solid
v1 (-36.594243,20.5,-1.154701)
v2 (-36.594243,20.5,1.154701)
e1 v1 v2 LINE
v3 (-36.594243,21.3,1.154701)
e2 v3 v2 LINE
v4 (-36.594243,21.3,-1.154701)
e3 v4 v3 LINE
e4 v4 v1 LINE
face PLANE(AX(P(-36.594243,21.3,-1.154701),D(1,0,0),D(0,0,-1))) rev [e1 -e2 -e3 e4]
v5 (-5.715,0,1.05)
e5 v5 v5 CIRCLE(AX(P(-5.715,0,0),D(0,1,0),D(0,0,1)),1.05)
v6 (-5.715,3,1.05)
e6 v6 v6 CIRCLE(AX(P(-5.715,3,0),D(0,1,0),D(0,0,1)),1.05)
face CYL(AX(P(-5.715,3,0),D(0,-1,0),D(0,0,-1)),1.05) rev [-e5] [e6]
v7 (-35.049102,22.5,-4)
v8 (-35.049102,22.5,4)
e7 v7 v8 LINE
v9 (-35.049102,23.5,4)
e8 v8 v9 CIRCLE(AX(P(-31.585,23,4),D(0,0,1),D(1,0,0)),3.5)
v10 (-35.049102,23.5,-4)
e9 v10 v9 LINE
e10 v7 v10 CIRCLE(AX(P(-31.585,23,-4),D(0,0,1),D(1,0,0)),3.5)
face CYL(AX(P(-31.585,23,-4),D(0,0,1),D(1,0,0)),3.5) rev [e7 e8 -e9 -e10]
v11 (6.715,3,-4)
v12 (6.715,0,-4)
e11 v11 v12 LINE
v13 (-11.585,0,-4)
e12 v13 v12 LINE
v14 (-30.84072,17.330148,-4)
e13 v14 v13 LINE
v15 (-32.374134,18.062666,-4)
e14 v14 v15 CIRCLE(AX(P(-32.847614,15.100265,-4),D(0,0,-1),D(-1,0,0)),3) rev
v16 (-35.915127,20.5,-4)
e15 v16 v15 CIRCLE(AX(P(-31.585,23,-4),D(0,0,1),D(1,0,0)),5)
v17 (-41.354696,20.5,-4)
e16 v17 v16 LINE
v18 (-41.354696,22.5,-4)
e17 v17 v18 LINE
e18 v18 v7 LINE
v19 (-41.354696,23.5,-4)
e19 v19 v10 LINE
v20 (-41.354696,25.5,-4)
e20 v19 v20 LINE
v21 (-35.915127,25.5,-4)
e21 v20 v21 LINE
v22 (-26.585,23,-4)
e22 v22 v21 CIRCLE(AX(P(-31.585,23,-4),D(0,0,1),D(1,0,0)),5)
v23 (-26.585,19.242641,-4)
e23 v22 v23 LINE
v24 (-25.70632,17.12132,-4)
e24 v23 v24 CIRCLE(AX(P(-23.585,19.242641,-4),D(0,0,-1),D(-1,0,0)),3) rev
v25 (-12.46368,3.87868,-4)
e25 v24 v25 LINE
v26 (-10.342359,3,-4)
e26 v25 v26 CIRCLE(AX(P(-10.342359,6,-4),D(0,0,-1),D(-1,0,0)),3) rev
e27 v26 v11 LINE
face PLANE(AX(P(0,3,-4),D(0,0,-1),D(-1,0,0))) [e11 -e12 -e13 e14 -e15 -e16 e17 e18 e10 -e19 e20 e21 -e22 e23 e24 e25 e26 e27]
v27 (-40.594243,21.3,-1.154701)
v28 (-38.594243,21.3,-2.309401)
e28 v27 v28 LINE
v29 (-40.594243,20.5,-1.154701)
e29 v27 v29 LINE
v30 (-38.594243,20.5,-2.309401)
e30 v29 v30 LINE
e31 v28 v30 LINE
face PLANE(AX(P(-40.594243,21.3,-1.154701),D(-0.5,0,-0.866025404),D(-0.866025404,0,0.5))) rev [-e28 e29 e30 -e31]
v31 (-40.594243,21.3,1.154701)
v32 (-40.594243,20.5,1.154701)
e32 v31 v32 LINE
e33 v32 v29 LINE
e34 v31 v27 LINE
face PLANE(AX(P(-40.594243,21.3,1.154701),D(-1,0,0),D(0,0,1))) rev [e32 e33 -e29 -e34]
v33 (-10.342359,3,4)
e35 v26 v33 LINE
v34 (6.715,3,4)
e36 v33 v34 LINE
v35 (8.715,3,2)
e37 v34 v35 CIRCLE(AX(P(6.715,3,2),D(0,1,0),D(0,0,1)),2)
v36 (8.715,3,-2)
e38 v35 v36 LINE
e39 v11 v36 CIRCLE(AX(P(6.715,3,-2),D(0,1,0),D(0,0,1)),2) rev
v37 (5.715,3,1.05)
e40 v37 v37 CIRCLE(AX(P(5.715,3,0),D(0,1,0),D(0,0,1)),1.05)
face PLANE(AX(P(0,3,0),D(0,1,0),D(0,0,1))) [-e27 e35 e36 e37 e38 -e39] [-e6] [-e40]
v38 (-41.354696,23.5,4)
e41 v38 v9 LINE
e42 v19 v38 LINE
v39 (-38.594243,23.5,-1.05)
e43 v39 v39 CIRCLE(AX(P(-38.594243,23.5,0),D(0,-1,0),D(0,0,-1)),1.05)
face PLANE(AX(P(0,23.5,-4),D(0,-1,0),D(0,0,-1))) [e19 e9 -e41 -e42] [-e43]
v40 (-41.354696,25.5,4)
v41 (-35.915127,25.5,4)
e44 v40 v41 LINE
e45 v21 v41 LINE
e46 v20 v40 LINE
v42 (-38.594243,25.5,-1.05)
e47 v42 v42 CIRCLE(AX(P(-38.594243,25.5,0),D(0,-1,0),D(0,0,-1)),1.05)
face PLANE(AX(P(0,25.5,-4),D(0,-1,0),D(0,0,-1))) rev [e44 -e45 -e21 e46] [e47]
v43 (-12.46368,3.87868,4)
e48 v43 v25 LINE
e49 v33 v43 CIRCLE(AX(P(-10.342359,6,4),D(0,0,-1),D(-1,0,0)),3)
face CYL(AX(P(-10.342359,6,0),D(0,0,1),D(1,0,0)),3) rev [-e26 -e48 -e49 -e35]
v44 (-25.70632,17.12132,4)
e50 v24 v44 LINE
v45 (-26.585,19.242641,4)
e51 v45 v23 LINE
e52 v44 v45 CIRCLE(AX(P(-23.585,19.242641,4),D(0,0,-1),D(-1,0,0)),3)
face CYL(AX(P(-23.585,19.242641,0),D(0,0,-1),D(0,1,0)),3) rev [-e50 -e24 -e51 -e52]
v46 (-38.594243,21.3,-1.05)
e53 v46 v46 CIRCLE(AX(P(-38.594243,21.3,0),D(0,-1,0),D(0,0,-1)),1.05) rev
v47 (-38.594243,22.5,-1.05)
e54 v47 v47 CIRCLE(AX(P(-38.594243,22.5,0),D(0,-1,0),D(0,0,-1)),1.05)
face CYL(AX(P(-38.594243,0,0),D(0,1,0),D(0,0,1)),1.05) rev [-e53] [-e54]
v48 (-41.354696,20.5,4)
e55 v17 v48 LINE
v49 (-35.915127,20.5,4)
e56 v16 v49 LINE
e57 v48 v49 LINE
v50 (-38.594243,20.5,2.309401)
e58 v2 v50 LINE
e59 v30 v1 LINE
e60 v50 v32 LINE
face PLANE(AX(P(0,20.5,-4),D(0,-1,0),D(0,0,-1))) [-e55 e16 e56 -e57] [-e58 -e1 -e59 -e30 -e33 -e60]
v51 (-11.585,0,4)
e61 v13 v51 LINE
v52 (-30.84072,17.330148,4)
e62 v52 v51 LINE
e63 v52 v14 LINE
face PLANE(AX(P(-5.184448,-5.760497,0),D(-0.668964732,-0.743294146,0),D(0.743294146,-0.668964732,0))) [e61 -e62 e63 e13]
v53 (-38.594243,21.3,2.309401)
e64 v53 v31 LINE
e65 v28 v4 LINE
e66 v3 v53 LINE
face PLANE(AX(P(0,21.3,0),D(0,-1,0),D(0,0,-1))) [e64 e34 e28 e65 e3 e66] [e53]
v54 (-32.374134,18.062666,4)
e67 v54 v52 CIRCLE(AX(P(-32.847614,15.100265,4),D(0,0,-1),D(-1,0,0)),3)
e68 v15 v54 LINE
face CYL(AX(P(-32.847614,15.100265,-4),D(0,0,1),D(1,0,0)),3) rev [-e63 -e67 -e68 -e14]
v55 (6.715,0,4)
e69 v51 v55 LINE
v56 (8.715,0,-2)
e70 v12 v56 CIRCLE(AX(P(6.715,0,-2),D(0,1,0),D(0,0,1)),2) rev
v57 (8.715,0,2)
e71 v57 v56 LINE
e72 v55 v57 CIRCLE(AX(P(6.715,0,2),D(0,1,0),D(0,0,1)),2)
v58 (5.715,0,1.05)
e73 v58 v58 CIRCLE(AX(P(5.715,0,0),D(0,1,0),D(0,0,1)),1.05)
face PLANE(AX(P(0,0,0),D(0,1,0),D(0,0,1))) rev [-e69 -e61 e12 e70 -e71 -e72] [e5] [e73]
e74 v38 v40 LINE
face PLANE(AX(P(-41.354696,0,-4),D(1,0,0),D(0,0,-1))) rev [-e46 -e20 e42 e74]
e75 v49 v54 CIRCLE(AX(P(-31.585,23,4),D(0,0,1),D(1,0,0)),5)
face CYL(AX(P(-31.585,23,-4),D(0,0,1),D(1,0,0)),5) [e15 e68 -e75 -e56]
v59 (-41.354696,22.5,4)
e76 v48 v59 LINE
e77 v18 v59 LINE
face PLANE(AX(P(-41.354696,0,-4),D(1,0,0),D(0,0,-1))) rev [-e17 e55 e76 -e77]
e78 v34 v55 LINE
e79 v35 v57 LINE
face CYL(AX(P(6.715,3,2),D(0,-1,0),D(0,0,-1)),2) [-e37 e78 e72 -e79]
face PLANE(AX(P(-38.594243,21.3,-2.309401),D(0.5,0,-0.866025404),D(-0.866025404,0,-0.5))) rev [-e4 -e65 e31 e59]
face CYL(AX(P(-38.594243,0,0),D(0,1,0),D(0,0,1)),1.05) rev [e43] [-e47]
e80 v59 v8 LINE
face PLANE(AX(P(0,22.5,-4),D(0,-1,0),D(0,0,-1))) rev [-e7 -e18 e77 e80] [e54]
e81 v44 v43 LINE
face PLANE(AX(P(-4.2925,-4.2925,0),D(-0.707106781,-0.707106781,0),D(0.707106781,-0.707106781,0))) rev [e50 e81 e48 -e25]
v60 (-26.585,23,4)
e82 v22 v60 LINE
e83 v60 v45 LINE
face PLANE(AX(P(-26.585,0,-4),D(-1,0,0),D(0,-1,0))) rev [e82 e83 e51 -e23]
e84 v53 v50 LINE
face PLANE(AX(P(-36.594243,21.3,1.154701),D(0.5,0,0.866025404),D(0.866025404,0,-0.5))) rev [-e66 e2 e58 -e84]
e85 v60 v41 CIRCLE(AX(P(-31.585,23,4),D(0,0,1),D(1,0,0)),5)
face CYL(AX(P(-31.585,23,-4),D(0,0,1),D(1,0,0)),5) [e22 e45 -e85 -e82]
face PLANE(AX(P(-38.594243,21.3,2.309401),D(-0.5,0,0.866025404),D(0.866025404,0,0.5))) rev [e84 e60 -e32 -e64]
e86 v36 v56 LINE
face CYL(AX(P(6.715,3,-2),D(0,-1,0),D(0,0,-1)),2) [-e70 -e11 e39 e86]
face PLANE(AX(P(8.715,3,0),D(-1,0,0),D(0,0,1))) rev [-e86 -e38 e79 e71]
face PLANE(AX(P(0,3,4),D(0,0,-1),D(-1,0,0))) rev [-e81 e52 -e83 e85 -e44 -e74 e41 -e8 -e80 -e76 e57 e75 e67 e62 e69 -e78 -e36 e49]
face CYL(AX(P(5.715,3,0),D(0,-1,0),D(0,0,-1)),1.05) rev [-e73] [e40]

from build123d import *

# Parameters (mm, degrees)
SKETCH1_R                = 1.05
BOSS_EXTRUDE1_DEPTH      = 3
BOSS_EXTRUDE2_DEPTH      = 4
BOSS_EXTRUDE2_DEPTH_BACK = 4
LOFT2_START              = -4
LOFT2_DEPTH              = 8
FILLET1_R                = 3
CUT_EXTRUDE1_DEPTH       = 49.748957751
CUT_EXTRUDE1_DEPTH_BACK  = 49.748957751
SKETCH8_R                = 1.05
CUT_EXTRUDE2_DEPTH       = 0.8


# Read off the part's stored shape, not the designer's step: Loft2
with BuildPart() as part:
    # Sketch1 → Boss-Extrude1 (new body)
    with BuildSketch(Plane(origin=(0, 0, 0), x_dir=(1, 0, 0), z_dir=(0, 1, 0))):
        with BuildLine():
            Line((-6.715, -4), (6.715, -4))
            ThreePointArc((6.715, -4), (8.129213562, -3.414213562), (8.715, -2))
            Line((8.715, -2), (8.715, 2))
            ThreePointArc((8.715, 2), (8.129213562, 3.414213562), (6.715, 4))
            Line((6.715, 4), (-6.715, 4))
            Line((-6.715, 4), (-11.585, 4))
            Line((-11.585, 4), (-11.585, -4))
            Line((-11.585, -4), (-6.715, -4))
        make_face()
        with Locations(Location((-5.715, 0, 0), (0, 0, 270))):
            Circle(SKETCH1_R, mode=Mode.SUBTRACT)
        with Locations(Location((5.715, 0, 0), (0, 0, 270))):
            Circle(SKETCH1_R, mode=Mode.SUBTRACT)
    extrude(amount=BOSS_EXTRUDE1_DEPTH)



with BuildPart() as body_2:
    # Sketch3 → Boss-Extrude2 (new, two sides: drawn at the far end of the back side and taken through both)
    with BuildSketch(Plane.XY.offset(-BOSS_EXTRUDE2_DEPTH_BACK)):
        with BuildLine():
            Line((-41.354696007, 22.5), (-41.354696007, 21.5))
            Line((-41.354696007, 21.5), (-41.354696007, 20.5))
            Line((-41.354696007, 20.5), (-36.354696007, 20.5))
            Line((-36.354696007, 20.5), (-35.915127019, 20.5))
            ThreePointArc((-35.915127019, 20.5), (-34.085, 18.669872981), (-31.585, 18))
            Line((-31.585, 18), (-26.585, 18))
            Line((-26.585, 18), (-26.585, 23))
            ThreePointArc((-26.585, 23), (-30.290904774, 27.829629131), (-35.915127019, 25.5))
            Line((-35.915127019, 25.5), (-36.354696007, 25.5))
            Line((-36.354696007, 25.5), (-41.354696007, 25.5))
            Line((-41.354696007, 25.5), (-41.354696007, 24.5))
            Line((-41.354696007, 24.5), (-41.354696007, 23.5))
            Line((-41.354696007, 23.5), (-36.354696007, 23.5))
            Line((-36.354696007, 23.5), (-35.049101615, 23.5))
            ThreePointArc((-35.049101615, 23.5), (-31.334356481, 26.491013868), (-28.085, 23))
            ThreePointArc((-28.085, 23), (-31.334356481, 19.508986132), (-35.049101615, 22.5))
            Line((-35.049101615, 22.5), (-36.354696007, 22.5))
            Line((-36.354696007, 22.5), (-41.354696007, 22.5))
        make_face()
    extrude(amount=BOSS_EXTRUDE2_DEPTH + BOSS_EXTRUDE2_DEPTH_BACK)


with BuildPart() as part_1:
    add(part.part)

    add(body_2.part)  # Loft2 merges body 2
    # Loft2 outline → Loft2 (add)
    with BuildSketch(Plane.XY.offset(LOFT2_START)):
        Polygon((-11.585, 3), (-26.585, 18), (-31.585, 18), (-11.585, 0), align=None)
    extrude(amount=LOFT2_DEPTH)

    # Fillet1
    fillet1_edges = [part_1.edges().sort_by_distance(p)[0] for p in [
        (-31.585, 18, 0),
        (-26.585, 18, 0),
        (-11.585, 3, 0),
    ]]
    fillet(fillet1_edges, radius=FILLET1_R)

    # Sketch8 → Cut-Extrude1 (cut, two sides: drawn at the far end of the back side and taken through both)
    with BuildSketch(Plane(origin=(0, 25.5, 0), x_dir=(1, 0, 0), z_dir=(0, 1, 0)).offset(-CUT_EXTRUDE1_DEPTH_BACK)):
        with Locations(Location((-38.59424289, 0, 0), (0, 0, 90))):
            Circle(SKETCH8_R)
    extrude(amount=CUT_EXTRUDE1_DEPTH + CUT_EXTRUDE1_DEPTH_BACK, mode=Mode.SUBTRACT)

    # Sketch9 → Cut-Extrude2 (cut)
    with BuildSketch(Plane.XZ.offset(-20.5)):
        Polygon((-36.59424289, 1.154700538), (-38.59424289, 2.309401077), (-40.59424289, 1.154700538), (-40.59424289, -1.154700538), (-38.59424289, -2.309401077), (-36.59424289, -1.154700538), align=None)
    extrude(amount=-CUT_EXTRUDE2_DEPTH, mode=Mode.SUBTRACT)


solid = part_1.part
